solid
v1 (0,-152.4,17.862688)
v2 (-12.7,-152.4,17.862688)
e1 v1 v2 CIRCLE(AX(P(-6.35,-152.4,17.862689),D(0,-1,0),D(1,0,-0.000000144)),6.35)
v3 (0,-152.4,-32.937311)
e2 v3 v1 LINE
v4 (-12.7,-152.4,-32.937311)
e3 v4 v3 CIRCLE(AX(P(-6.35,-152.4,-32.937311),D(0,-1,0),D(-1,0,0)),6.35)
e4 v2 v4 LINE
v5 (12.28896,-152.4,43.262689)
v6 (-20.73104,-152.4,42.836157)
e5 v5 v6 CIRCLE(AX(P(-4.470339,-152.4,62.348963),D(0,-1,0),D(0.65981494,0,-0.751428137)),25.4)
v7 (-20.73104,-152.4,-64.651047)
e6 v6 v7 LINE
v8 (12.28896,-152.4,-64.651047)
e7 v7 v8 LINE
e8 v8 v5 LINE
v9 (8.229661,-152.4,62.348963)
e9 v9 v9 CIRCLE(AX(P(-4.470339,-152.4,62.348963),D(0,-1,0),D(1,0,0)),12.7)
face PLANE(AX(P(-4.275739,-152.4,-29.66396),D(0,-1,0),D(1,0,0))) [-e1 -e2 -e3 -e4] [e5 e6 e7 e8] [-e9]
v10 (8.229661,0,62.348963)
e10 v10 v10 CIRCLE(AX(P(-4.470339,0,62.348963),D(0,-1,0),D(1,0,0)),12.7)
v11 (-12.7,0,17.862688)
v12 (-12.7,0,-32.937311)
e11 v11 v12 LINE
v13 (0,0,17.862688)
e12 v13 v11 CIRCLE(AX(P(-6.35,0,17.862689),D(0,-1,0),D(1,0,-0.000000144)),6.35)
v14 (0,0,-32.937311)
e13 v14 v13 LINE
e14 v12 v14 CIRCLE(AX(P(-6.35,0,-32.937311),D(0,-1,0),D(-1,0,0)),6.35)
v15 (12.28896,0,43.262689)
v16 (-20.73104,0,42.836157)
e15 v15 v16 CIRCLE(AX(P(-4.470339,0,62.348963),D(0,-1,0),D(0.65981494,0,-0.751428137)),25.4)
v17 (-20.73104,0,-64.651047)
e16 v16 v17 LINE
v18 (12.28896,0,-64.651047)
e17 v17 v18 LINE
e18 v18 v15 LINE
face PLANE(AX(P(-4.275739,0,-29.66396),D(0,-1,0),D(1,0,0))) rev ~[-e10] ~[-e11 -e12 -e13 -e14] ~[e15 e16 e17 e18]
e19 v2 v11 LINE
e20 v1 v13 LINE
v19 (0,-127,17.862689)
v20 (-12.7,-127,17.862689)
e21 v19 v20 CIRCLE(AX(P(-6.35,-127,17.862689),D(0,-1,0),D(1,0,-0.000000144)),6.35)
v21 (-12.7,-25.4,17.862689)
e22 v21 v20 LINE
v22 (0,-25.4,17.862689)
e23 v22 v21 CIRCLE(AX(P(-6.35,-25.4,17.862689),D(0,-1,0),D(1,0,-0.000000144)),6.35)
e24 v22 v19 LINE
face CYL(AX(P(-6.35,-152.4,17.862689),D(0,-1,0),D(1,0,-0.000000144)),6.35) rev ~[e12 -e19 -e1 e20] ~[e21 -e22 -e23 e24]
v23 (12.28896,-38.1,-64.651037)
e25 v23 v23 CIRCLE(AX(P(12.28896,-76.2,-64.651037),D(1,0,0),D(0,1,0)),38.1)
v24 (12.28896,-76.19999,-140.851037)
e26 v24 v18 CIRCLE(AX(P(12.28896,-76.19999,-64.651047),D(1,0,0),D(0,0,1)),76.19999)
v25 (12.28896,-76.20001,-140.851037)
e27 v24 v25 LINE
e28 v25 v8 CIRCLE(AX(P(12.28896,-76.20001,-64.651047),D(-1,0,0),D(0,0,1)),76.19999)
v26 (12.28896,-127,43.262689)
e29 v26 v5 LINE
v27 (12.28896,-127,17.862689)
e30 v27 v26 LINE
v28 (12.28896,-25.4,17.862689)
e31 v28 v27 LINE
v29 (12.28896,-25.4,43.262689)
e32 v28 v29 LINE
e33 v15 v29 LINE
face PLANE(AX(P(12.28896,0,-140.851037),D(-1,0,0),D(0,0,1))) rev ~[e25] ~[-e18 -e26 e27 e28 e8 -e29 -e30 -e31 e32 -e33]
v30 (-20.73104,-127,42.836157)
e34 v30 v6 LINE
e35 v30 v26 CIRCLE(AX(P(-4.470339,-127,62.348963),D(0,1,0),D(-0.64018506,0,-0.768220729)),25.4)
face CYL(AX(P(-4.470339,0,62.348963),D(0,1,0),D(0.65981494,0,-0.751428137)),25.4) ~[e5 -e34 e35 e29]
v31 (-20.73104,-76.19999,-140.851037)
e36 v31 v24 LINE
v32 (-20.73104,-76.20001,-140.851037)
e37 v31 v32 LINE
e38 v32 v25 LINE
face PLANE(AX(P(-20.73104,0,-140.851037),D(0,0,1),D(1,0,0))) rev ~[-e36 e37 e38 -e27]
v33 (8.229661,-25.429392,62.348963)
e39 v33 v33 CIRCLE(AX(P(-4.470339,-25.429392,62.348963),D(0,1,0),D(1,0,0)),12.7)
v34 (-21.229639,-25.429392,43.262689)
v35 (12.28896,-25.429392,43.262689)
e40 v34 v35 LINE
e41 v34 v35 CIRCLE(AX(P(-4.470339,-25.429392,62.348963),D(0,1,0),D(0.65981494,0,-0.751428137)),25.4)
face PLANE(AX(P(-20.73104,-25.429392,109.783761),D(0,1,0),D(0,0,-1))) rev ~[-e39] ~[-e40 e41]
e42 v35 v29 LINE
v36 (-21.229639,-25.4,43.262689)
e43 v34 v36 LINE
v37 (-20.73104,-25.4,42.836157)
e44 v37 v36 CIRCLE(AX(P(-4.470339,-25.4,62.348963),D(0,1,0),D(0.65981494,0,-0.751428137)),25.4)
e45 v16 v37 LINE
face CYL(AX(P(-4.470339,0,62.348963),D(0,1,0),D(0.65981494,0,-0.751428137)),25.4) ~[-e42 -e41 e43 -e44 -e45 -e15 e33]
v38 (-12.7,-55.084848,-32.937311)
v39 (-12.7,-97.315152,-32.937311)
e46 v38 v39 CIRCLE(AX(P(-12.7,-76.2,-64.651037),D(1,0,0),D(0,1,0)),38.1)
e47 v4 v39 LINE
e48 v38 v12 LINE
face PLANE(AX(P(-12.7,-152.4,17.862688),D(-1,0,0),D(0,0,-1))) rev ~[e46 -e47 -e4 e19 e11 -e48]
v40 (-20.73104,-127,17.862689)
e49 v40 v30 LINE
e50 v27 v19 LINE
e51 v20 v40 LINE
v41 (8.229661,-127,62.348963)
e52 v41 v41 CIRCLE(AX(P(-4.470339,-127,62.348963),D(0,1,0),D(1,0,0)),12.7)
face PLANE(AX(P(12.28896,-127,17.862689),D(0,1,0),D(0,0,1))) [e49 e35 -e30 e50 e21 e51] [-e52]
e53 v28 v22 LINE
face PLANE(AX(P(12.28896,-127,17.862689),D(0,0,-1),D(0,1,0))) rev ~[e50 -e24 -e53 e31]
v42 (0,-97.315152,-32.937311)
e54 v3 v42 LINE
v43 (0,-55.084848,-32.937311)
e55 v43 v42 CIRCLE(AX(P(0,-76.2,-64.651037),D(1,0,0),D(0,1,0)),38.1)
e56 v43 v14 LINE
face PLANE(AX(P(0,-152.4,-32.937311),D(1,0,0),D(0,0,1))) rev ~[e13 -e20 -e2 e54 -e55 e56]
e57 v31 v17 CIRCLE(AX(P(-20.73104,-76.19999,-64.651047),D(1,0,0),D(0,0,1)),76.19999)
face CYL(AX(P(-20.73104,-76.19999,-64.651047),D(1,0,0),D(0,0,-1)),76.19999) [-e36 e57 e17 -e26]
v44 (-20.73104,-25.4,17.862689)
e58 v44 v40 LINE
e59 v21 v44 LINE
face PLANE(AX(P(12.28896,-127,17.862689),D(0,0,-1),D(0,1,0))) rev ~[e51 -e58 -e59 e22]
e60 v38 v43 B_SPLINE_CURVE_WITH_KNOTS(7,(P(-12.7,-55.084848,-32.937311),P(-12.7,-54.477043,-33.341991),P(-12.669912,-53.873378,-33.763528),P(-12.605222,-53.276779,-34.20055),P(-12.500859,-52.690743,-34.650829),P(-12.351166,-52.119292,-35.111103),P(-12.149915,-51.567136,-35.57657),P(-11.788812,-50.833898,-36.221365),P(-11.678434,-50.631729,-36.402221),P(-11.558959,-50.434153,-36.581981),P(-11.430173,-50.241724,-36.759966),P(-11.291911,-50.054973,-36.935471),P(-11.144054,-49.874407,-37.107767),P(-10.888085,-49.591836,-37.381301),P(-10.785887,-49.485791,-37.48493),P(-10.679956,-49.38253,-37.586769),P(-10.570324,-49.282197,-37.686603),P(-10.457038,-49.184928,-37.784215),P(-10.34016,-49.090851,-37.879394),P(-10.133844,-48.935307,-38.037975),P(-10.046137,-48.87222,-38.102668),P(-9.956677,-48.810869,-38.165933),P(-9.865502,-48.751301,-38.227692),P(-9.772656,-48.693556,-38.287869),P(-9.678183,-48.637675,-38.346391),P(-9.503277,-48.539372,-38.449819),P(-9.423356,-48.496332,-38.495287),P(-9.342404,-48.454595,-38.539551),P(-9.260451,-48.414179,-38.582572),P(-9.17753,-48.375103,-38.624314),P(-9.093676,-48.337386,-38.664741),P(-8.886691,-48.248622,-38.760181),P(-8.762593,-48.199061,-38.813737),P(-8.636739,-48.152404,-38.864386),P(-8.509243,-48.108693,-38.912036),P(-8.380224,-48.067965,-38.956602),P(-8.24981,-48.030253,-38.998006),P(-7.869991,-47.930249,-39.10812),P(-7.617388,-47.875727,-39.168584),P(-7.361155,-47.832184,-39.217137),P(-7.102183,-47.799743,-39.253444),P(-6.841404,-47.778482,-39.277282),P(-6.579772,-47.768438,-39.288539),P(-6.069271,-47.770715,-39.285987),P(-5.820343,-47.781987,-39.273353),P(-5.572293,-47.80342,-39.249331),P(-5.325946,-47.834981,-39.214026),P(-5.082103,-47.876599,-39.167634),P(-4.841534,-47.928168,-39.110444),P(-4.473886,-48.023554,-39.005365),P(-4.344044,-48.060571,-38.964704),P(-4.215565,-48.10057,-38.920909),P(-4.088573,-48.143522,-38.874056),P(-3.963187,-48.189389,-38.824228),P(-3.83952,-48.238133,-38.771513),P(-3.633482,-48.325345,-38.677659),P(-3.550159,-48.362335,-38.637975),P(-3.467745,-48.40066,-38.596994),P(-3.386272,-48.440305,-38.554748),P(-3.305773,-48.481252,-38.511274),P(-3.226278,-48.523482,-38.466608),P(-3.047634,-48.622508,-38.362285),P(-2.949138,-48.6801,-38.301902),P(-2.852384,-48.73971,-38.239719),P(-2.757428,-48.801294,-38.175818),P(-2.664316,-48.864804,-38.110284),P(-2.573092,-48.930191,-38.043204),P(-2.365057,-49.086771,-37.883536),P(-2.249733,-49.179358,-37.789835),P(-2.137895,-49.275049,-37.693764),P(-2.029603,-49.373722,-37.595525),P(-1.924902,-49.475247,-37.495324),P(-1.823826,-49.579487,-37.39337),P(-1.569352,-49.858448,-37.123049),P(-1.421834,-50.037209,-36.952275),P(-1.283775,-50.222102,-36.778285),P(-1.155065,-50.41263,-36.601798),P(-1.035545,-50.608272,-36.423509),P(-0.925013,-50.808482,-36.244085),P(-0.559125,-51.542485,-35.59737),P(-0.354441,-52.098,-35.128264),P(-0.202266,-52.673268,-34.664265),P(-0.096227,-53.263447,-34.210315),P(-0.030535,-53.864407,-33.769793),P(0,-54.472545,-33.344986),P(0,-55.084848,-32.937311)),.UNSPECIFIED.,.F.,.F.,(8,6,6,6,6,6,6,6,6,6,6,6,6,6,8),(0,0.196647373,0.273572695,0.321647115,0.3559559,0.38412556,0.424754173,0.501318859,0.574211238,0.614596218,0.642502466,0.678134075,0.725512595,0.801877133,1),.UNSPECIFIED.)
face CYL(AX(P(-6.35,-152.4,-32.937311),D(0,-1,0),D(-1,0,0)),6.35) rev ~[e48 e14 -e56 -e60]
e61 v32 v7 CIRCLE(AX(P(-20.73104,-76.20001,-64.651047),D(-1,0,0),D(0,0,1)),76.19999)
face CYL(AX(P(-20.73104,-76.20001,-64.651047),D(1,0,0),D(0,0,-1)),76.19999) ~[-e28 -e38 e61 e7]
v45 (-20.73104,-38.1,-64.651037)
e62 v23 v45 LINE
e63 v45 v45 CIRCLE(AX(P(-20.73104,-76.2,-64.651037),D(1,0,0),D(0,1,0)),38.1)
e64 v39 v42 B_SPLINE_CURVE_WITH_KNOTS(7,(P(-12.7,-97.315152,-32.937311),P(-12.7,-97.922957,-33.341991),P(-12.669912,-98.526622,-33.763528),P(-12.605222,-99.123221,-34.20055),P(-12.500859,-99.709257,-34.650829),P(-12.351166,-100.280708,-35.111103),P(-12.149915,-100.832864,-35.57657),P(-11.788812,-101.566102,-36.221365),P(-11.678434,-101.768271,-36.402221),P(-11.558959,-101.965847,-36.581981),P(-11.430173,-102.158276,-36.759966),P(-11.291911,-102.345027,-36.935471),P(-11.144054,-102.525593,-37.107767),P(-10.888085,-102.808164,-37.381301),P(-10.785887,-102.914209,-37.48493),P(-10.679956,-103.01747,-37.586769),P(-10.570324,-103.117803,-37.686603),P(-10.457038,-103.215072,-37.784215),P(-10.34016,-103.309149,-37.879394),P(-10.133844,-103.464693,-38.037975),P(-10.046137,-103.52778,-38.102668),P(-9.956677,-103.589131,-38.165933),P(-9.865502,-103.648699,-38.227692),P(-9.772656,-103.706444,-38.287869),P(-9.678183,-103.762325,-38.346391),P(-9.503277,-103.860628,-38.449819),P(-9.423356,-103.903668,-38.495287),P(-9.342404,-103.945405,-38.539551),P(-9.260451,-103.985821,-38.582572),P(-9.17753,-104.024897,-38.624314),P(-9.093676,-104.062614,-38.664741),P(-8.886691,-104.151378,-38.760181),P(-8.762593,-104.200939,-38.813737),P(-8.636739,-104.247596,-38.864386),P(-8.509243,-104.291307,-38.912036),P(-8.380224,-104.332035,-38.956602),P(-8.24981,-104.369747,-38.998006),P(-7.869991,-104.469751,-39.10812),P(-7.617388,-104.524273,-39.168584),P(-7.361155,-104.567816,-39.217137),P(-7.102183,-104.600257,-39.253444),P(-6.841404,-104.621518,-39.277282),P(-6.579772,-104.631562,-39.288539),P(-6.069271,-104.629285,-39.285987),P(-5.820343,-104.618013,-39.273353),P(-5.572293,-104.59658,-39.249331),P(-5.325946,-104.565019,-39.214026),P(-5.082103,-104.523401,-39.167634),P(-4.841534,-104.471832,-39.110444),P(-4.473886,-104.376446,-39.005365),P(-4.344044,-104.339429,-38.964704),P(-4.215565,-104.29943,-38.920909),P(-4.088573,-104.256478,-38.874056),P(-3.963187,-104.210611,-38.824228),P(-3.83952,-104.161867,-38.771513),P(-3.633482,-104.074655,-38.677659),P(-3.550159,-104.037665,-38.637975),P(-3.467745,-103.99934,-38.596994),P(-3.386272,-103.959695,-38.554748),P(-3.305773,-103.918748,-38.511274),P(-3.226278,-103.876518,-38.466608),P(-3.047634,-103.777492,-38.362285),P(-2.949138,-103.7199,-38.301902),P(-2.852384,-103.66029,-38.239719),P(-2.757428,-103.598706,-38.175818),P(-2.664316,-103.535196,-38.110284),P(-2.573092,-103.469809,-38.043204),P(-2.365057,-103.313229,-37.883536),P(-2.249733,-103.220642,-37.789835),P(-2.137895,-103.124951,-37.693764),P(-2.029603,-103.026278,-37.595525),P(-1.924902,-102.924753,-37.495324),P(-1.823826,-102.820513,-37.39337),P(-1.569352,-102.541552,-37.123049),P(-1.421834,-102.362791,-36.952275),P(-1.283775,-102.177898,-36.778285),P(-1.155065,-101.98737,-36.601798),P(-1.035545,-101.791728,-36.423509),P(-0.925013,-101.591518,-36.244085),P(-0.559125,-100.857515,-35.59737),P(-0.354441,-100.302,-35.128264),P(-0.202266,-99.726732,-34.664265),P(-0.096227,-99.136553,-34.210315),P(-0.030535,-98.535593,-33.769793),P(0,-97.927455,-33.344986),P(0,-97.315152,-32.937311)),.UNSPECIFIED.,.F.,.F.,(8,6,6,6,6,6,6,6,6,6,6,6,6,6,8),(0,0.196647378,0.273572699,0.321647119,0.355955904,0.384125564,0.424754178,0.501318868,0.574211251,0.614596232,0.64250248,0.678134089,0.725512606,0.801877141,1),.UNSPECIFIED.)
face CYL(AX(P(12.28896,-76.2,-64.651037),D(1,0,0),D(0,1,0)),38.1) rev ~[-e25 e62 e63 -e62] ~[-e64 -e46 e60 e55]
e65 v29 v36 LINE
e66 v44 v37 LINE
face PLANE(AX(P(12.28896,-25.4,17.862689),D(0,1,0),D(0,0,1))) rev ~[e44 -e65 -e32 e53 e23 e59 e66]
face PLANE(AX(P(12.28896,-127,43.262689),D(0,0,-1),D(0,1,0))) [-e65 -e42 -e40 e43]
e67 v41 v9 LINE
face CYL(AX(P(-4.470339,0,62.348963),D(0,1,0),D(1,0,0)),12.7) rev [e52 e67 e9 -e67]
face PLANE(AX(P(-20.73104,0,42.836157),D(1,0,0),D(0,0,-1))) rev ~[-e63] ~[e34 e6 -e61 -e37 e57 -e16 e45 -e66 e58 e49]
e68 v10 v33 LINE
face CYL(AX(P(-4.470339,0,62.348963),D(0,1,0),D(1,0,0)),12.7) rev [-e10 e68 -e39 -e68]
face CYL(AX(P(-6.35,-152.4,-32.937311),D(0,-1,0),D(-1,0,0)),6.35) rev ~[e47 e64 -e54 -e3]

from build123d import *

# Parameters (mm, degrees)
F0_R     = 12.7
F1_DEPTH = 152.4
F2_R     = 76.19999
F3_R     = 38.1
F4_DEPTH = 42.1602994648
F3_W     = 101.6
F3_H     = 25.4
F5_DEPTH = 42.1602994648
F7_DEPTH = 45.29165
F9_DEPTH = 152.401


# Not quite as in the source:
# - a fillet or chamfer is up to 0.001 mm smaller than in the source, because OpenCascade refuses the exact size


with BuildPart() as f1:
    # F0 (on Front) → F1 (new body)
    with BuildSketch(Plane.XZ):
        with BuildLine():
            ThreePointArc((12.2889600906, 43.2626888076), (-4.7984134102, 87.7468446554), (-20.7310399094, 42.83615698))
            Line((-20.7310399094, 42.83615698), (-20.7310399094, -140.8510365048))
            Line((-20.7310399094, -140.8510365048), (12.2889600906, -140.8510365048))
            Line((12.2889600906, -140.8510365048), (12.2889600906, 43.2626888076))
        make_face()
        with Locations((-4.4703393742, 62.3489634952)):
            Circle(F0_R, mode=Mode.SUBTRACT)
    extrude(amount=F1_DEPTH)

    # F2 (radius 76.2 in the source; OpenCascade refuses exactly that, so slightly less here)
    f2_edges = [f1.edges().sort_by_distance(p)[0] for p in [
        (-4.22104, -152.4, -140.851037),
        (-4.22104, 0, -140.851037),
    ]]
    fillet(f2_edges, radius=F2_R)

    # F3 (on face) → F4 (cut, through all)
    with BuildSketch(Plane.YZ.offset(12.2889600906)):
        with Locations((-76.2, -64.6510365048)):
            Circle(F3_R)
    extrude(amount=-F4_DEPTH, mode=Mode.SUBTRACT)

    # F3 (on face) → F5 (cut, through all)
    with BuildSketch(Plane.YZ.offset(12.2889600906)):
        with Locations((-76.2, 30.5626888076)):
            Rectangle(F3_W, F3_H)
    extrude(amount=-F5_DEPTH, mode=Mode.SUBTRACT)

    # F6 (on face) → F7 (cut, symmetric)
    with BuildSketch(Plane(origin=(-20.7310399094, 0, 0), x_dir=(0, -1, 0), z_dir=(-1, 0, 0))):
        Polygon((25.4293922335, 17.8626888076), (127, 17.8626888076), (127, 42.83615698), (127, 109.7837612033), (25.4293922335, 109.7837612033), align=None)
    extrude(amount=F7_DEPTH, both=True, mode=Mode.SUBTRACT)

    # F8 (on face) → F9 (cut, through all)
    with BuildSketch(Plane.XZ.offset(152.4)):
        with BuildLine():
            Line((0, -32.9373111924), (0, 17.8626878918))
            ThreePointArc((0, 17.8626878918), (-6.35, 24.2126888076), (-12.7, 17.8626878918))
            Line((-12.7, 17.8626878918), (-12.7, -32.9373111924))
            ThreePointArc((-12.7, -32.9373111924), (-6.35, -39.2873111924), (0, -32.9373111924))
        make_face()
    extrude(amount=-F9_DEPTH, mode=Mode.SUBTRACT)


solid = f1.part
